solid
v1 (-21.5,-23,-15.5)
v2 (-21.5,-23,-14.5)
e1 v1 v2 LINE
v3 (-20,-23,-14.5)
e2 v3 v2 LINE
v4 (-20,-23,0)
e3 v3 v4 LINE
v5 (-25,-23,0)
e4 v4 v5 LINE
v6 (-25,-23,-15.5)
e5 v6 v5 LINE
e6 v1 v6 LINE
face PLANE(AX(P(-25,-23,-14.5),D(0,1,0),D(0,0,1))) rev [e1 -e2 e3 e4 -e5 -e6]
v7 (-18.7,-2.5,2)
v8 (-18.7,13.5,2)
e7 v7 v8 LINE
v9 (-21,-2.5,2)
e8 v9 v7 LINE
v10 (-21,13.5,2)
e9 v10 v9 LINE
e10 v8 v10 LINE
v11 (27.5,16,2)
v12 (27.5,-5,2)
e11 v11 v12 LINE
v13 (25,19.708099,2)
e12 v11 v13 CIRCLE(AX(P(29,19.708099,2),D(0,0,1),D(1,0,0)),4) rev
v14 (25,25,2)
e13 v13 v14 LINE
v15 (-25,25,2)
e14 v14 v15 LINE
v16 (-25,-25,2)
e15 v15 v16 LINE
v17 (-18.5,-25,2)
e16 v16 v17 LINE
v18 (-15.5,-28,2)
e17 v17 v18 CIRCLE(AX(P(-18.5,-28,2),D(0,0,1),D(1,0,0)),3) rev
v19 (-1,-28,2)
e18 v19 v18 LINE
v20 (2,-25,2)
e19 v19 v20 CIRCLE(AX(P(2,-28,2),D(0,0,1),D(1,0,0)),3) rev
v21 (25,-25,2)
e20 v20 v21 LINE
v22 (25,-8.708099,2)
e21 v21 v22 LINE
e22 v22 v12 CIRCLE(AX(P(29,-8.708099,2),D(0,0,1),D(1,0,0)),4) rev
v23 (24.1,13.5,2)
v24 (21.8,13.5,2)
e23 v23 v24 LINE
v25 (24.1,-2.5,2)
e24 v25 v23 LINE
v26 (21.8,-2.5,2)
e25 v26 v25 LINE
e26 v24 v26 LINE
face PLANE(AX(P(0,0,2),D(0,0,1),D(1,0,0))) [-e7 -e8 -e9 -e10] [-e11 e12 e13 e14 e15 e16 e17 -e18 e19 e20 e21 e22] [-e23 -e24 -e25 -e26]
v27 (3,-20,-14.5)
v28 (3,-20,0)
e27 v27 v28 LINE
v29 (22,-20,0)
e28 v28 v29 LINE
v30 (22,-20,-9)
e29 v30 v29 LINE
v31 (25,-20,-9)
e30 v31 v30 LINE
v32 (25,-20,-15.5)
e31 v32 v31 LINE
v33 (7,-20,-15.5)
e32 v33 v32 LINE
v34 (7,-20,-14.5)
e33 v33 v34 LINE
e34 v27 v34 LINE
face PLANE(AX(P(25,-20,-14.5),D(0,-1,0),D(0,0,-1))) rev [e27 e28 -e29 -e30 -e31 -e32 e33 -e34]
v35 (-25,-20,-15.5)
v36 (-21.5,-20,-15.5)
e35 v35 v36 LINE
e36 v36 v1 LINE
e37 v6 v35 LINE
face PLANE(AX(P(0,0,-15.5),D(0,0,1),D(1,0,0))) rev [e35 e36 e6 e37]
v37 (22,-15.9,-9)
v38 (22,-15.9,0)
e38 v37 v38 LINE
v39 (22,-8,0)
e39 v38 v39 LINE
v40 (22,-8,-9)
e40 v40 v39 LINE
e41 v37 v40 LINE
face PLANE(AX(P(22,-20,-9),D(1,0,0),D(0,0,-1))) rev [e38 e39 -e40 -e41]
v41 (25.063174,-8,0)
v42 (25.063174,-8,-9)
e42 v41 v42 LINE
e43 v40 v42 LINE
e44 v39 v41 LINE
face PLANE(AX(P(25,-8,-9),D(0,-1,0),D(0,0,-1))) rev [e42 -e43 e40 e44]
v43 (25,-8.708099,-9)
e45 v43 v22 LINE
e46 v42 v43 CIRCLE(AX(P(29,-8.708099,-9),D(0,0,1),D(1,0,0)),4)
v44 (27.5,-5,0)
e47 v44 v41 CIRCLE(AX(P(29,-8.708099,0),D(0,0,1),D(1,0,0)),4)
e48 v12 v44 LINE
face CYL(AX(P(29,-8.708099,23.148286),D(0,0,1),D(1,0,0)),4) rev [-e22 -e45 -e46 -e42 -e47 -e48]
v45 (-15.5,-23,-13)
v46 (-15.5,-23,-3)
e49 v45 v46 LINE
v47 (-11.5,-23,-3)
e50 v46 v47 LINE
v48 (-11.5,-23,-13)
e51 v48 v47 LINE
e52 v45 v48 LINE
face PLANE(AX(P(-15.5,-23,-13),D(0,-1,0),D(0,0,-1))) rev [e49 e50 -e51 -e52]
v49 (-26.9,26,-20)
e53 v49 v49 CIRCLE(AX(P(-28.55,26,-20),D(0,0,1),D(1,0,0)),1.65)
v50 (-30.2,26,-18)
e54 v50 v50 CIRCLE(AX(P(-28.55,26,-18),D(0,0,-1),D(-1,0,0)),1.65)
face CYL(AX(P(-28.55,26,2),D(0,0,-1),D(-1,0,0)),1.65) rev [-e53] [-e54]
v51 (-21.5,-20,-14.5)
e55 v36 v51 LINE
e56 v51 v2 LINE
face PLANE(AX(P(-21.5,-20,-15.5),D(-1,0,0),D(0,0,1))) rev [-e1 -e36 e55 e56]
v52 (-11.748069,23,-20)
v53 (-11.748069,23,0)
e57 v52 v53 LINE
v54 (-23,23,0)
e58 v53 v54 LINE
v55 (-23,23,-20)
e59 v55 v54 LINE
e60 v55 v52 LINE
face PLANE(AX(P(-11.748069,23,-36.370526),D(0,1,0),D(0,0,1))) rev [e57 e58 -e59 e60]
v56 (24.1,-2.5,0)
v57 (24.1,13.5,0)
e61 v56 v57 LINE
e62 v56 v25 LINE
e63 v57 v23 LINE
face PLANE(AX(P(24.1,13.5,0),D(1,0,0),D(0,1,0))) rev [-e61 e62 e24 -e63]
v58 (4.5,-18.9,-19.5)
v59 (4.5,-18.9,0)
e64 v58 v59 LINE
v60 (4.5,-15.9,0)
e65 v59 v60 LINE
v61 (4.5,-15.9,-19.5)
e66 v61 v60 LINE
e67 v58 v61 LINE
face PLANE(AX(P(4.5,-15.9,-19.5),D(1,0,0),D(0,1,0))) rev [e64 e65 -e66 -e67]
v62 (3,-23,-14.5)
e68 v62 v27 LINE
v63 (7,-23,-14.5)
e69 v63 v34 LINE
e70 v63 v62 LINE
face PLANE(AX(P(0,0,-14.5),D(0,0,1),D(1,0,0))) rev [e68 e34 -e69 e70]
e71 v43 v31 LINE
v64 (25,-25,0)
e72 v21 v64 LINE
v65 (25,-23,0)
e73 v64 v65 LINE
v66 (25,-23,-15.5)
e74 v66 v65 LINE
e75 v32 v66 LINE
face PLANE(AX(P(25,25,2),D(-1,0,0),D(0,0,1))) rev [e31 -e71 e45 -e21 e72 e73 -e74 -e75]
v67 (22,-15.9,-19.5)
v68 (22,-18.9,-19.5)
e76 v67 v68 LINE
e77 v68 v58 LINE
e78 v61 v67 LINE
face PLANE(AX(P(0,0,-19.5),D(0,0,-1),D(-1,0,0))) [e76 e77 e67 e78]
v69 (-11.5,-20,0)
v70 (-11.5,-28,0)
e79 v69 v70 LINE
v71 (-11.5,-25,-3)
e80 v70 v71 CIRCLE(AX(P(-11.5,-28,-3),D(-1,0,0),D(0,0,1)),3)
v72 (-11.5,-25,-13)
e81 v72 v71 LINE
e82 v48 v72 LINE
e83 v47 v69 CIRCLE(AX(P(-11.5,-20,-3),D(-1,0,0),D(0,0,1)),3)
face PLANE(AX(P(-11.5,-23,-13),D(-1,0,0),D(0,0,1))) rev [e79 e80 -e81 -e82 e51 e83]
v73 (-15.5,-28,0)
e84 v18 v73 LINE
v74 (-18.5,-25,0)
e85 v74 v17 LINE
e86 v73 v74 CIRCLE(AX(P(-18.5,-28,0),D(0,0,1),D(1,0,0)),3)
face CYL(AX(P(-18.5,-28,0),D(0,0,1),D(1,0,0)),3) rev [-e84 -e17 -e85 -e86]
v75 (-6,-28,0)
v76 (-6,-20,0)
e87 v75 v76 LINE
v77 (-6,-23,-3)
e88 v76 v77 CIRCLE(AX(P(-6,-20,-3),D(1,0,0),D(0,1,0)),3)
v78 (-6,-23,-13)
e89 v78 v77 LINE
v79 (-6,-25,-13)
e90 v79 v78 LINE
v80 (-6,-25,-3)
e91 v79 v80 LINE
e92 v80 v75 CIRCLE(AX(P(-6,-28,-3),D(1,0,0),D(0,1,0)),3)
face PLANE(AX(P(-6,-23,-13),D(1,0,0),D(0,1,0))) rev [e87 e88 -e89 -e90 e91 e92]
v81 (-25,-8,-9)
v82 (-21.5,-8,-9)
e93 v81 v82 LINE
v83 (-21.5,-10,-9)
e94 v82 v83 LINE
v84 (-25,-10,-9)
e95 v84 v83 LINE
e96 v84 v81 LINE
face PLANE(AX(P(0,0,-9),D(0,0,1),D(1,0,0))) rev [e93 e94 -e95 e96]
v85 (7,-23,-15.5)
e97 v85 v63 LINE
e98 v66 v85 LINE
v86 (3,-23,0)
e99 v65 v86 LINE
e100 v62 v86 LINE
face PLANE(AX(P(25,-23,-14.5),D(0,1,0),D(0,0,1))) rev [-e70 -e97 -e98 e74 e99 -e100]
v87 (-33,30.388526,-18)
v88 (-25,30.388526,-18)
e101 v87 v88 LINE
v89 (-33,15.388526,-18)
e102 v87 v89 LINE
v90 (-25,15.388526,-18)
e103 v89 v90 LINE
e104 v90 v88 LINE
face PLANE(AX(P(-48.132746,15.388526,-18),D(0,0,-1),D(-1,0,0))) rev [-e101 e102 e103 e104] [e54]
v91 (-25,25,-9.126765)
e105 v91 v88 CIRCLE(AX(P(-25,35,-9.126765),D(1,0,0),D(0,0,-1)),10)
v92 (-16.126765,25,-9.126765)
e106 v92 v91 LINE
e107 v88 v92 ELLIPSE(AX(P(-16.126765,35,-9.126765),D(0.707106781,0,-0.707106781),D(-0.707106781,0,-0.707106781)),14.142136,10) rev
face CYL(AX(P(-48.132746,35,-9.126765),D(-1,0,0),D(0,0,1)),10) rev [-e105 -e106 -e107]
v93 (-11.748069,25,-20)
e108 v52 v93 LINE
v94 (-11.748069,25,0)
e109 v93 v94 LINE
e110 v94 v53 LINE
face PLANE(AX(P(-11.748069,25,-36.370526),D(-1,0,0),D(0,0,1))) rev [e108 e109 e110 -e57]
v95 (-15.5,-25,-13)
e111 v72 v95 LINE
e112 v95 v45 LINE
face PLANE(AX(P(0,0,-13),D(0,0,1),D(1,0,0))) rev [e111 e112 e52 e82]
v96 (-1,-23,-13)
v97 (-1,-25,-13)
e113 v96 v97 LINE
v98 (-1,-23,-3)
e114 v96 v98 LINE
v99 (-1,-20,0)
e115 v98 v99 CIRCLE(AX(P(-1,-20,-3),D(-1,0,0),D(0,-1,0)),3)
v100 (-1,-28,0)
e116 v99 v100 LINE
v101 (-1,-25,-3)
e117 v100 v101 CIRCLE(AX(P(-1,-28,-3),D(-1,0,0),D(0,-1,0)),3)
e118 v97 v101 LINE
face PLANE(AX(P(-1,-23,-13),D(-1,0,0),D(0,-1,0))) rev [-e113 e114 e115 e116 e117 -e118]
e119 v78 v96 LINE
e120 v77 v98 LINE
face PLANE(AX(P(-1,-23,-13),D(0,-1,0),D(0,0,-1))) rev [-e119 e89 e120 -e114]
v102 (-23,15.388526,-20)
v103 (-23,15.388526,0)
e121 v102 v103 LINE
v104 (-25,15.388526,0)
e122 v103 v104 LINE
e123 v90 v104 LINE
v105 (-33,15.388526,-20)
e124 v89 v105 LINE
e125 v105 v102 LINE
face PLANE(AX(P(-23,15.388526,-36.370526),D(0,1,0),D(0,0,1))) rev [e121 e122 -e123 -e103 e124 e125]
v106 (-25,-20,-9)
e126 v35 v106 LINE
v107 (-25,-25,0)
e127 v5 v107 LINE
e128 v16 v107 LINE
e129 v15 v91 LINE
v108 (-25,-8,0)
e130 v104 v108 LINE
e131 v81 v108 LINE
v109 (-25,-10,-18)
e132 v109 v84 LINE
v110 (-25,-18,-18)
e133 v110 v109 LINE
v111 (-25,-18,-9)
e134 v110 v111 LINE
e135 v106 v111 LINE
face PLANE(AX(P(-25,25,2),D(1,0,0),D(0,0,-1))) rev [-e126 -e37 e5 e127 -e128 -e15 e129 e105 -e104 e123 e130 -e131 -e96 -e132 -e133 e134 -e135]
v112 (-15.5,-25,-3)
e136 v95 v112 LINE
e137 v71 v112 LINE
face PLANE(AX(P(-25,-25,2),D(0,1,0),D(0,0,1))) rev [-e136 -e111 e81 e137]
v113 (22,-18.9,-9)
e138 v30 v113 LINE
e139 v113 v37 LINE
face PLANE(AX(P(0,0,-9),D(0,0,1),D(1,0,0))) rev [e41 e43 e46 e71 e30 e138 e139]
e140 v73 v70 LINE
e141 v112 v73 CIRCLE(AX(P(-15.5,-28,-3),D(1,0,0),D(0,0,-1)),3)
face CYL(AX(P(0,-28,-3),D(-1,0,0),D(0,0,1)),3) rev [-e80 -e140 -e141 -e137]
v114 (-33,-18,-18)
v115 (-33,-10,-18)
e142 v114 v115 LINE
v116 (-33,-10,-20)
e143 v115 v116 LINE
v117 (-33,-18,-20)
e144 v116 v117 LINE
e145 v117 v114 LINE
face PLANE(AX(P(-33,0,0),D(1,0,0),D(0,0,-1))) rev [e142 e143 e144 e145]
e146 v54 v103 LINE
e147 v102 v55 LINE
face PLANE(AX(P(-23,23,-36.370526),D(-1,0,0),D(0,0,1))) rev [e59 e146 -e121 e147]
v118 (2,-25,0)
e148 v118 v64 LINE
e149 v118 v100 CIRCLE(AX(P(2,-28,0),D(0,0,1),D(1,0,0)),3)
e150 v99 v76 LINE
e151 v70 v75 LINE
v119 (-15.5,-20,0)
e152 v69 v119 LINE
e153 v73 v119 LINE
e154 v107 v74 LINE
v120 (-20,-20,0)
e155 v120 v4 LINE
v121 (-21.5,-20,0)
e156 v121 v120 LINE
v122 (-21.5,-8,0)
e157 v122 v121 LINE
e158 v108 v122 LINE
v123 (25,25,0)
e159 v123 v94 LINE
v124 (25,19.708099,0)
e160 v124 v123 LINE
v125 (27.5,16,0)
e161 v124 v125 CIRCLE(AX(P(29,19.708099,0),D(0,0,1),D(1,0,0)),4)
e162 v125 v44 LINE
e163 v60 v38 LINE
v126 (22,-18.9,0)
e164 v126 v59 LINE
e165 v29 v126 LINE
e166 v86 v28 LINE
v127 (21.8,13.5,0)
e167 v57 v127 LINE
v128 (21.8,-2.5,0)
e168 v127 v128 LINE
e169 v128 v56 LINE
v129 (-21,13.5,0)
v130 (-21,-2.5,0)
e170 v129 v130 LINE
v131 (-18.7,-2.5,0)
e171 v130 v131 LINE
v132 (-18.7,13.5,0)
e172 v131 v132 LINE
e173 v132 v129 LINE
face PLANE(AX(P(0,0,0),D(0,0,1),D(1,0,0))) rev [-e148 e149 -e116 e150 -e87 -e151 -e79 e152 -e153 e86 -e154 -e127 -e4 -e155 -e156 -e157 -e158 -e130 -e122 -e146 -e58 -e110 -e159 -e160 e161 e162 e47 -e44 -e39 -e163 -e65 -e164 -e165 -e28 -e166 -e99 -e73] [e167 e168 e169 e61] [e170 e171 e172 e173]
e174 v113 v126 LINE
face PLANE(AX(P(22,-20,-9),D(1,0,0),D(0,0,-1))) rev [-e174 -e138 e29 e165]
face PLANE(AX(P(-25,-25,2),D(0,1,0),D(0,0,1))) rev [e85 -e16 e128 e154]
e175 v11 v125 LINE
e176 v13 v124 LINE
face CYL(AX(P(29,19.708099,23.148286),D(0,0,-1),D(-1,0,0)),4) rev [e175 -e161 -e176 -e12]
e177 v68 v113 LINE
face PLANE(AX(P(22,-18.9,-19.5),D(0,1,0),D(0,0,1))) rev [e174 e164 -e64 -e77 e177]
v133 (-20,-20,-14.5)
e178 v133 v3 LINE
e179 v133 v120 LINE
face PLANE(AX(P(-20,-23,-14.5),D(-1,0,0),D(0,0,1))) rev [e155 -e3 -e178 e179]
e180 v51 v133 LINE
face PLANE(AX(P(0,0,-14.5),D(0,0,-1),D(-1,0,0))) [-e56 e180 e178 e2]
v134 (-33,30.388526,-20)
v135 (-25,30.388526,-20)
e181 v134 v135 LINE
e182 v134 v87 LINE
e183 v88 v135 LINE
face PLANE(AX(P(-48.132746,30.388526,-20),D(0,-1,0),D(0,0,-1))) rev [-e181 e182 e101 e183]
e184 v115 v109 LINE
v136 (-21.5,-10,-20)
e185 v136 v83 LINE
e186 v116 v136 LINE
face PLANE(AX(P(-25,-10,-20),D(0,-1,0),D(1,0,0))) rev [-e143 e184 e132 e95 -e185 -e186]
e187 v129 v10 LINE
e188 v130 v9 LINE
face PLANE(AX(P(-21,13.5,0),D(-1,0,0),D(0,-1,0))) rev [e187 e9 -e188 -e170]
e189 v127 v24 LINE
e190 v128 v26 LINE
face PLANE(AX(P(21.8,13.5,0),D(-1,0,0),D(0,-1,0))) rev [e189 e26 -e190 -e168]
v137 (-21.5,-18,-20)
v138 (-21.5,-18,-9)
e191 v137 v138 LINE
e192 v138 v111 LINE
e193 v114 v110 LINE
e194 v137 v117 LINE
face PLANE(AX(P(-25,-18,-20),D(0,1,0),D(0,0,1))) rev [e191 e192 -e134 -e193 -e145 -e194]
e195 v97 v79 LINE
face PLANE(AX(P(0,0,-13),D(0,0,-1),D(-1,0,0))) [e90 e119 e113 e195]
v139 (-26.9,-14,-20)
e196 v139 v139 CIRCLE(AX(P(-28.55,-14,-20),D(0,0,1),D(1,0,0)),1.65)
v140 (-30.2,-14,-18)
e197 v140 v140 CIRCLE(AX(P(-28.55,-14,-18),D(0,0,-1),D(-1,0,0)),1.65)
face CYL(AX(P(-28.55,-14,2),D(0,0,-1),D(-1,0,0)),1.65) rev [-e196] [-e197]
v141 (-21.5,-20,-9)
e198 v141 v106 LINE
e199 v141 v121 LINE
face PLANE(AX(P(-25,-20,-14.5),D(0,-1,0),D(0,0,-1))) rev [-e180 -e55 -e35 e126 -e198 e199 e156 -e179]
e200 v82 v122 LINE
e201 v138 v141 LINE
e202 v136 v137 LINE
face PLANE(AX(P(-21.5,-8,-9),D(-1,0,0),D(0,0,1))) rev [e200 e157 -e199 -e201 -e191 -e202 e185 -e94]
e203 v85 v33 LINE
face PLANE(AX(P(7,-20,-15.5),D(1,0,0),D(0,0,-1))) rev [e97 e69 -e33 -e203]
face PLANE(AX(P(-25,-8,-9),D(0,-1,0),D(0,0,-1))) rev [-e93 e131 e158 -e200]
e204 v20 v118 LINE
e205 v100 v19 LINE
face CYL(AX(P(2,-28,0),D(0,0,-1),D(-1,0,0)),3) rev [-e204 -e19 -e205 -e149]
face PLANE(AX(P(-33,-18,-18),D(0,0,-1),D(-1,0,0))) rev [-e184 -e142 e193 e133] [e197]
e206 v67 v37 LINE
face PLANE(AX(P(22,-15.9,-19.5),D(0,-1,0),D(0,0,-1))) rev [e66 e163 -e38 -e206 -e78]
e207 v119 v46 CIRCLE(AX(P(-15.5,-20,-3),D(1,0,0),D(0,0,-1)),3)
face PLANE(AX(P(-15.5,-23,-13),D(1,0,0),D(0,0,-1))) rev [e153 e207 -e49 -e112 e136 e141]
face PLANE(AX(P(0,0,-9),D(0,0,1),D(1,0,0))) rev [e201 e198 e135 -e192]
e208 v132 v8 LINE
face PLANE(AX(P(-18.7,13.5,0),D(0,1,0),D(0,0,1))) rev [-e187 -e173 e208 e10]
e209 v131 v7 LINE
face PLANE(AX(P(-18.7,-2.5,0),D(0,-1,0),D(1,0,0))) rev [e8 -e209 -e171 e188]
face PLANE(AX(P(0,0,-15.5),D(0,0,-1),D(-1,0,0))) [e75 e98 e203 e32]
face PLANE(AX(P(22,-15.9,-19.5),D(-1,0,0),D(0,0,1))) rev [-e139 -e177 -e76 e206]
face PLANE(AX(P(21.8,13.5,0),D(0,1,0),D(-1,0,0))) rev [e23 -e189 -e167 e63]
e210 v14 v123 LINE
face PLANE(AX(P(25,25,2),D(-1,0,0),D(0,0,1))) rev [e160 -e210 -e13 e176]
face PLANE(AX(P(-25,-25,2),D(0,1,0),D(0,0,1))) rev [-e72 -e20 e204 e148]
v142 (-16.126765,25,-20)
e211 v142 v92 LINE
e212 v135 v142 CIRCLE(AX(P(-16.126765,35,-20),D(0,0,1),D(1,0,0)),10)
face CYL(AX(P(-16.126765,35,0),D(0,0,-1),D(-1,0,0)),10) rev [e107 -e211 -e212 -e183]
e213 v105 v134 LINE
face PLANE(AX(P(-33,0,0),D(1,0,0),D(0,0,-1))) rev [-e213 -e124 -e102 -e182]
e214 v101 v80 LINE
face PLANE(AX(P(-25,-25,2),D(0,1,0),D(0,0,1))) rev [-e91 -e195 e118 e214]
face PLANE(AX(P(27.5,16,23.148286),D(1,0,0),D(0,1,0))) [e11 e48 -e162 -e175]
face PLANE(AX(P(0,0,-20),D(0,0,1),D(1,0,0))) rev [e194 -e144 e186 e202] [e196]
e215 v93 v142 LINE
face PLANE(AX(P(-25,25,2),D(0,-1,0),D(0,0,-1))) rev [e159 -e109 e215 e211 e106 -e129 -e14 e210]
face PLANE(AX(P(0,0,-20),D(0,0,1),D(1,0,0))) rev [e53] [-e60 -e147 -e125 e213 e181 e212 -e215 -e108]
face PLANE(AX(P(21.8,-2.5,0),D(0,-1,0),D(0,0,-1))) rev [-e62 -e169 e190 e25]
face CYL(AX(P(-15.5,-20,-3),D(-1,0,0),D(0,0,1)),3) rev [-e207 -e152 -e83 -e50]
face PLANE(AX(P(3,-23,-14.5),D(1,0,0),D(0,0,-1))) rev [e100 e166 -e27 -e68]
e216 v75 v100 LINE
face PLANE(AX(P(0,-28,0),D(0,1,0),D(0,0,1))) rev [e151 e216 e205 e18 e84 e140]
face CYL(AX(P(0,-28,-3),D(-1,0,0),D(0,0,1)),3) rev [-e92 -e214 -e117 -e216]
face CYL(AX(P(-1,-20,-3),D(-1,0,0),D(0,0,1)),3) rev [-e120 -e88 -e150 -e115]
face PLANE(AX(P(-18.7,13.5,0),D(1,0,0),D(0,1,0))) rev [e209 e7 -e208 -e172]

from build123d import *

# Parameters (mm, degrees)
SKETCH1_W               = 50
SKETCH1_H               = 50
BOSS_EXTRUDE1_DEPTH     = 2
CUT_EXTRUDE1_DEPTH      = 36.411862419
CUT_EXTRUDE1_DEPTH_BACK = 36.411862419
SKETCH2_W               = 2.3
SKETCH2_H               = 16
SKETCH3_W               = 22
SKETCH3_H               = 3
SKETCH3_W_2             = 5
BOSS_EXTRUDE2_DEPTH     = 14.5
SKETCH4_W               = 5
SKETCH4_H               = 2
SKETCH4_W_2             = 4
BOSS_EXTRUDE11_DEPTH    = 13
SKETCH5_W               = 3.5
SKETCH5_H               = 3
SKETCH5_W_2             = 18
BOSS_EXTRUDE12_DEPTH    = 1
SKETCH6_W               = 3.5
SKETCH6_H               = 12
SKETCH6_W_2             = 3
BOSS_EXTRUDE13_DEPTH    = 9
SKETCH7_W               = 3.5
SKETCH7_H               = 8
BOSS_EXTRUDE14_DEPTH    = 11
SKETCH8_W               = 2
SKETCH8_H               = 8
BOSS_EXTRUDE15_DEPTH    = 8
BOSS_EXTRUDE16_DEPTH    = 20
SKETCH10_W              = 2
SKETCH10_H              = 15
BOSS_EXTRUDE17_DEPTH    = 8
FILLET1_R               = 10
FILLET2_START           = -18
FILLET2_DEPTH           = 0.13972
FILLET2_START_2         = -17.86028
FILLET2_2_DEPTH         = 8.733515347
FILLET2_START_3         = -25
FILLET2_3_DEPTH         = 8.873235347
CUT_EXTRUDE2_DEPTH      = 50.964612469
CUT_EXTRUDE2_DEPTH_BACK = 50.964612469
SKETCH11_R              = 1.65
SKETCH13_W              = 2.5
SKETCH13_H              = 21
BOSS_EXTRUDE18_DEPTH    = 2
FILLET3_R               = 4
SKETCH14_W              = 17.5
SKETCH14_H              = 3
BOSS_EXTRUDE19_DEPTH    = 19.5
FILLET4_R               = 3
SKETCH15_W              = 14.5
SKETCH15_H              = 2
BOSS_EXTRUDE20_DEPTH    = 3
FILLET5_R               = 3
FILLET6_R               = 3


with BuildPart() as part:
    # Sketch1 → Boss-Extrude1 (new body)
    with BuildSketch(Plane.XY):
        Rectangle(SKETCH1_W, SKETCH1_H)
    extrude(amount=BOSS_EXTRUDE1_DEPTH)

    # Sketch2 → Cut-Extrude1 (cut, two sides: drawn at the far end of the back side and taken through both)
    with BuildSketch(Plane.XY.offset(2).offset(-CUT_EXTRUDE1_DEPTH_BACK)):
        with Locations((-19.85, 5.5)):
            Rectangle(SKETCH2_W, SKETCH2_H)
        with Locations((22.95, 5.5)):
            Rectangle(SKETCH2_W, SKETCH2_H)
    extrude(amount=CUT_EXTRUDE1_DEPTH + CUT_EXTRUDE1_DEPTH_BACK, mode=Mode.SUBTRACT)

    # Sketch3 → Boss-Extrude2 (add)
    with BuildSketch(Plane(origin=(0, 0, 0), x_dir=(-1, 0, 0), z_dir=(0, 0, -1))):
        with Locations((-14, -21.5)):
            Rectangle(SKETCH3_W, SKETCH3_H)
        with Locations((22.5, -21.5)):
            Rectangle(SKETCH3_W_2, SKETCH3_H)
    extrude(amount=BOSS_EXTRUDE2_DEPTH)

    # Sketch4 → Boss-Extrude11 (add)
    with BuildSketch(Plane(origin=(0, 0, 0), x_dir=(-1, 0, 0), z_dir=(0, 0, -1))):
        with Locations((3.5, -24)):
            Rectangle(SKETCH4_W, SKETCH4_H)
        with Locations((13.5, -24)):
            Rectangle(SKETCH4_W_2, SKETCH4_H)
    extrude(amount=BOSS_EXTRUDE11_DEPTH)

    # Sketch5 → Boss-Extrude12 (add)
    with BuildSketch(Plane(origin=(0, 0, -14.5), x_dir=(-1, 0, 0), z_dir=(0, 0, -1))):
        with Locations((23.25, -21.5)):
            Rectangle(SKETCH5_W, SKETCH5_H)
        with Locations((-16, -21.5)):
            Rectangle(SKETCH5_W_2, SKETCH5_H)
    extrude(amount=BOSS_EXTRUDE12_DEPTH)

    # Sketch6 → Boss-Extrude13 (add)
    with BuildSketch(Plane(origin=(0, 0, 0), x_dir=(-1, 0, 0), z_dir=(0, 0, -1))):
        with Locations((23.25, -14)):
            Rectangle(SKETCH6_W, SKETCH6_H)
        with Locations((-23.5, -14)):
            Rectangle(SKETCH6_W_2, SKETCH6_H)
    extrude(amount=BOSS_EXTRUDE13_DEPTH)

    # Sketch7 → Boss-Extrude14 (add)
    with BuildSketch(Plane(origin=(0, 0, -9), x_dir=(-1, 0, 0), z_dir=(0, 0, -1))):
        with Locations((23.25, -14)):
            Rectangle(SKETCH7_W, SKETCH7_H)
    extrude(amount=BOSS_EXTRUDE14_DEPTH)

    # Sketch8 → Boss-Extrude15 (add)
    with BuildSketch(Plane.ZY.offset(25)):
        with Locations((-19, -14)):
            Rectangle(SKETCH8_W, SKETCH8_H)
    extrude(amount=BOSS_EXTRUDE15_DEPTH)

    # Sketch9 → Boss-Extrude16 (add)
    with BuildSketch(Plane(origin=(0, 0, 0), x_dir=(-1, 0, 0), z_dir=(0, 0, -1))):
        Polygon((11.748068925, 25), (11.748068925, 23), (23, 23), (23, 15.388525781), (25, 15.388525781), (25, 25), align=None)
    extrude(amount=BOSS_EXTRUDE16_DEPTH)

    # Sketch10 → Boss-Extrude17 (add)
    with BuildSketch(Plane.ZY.offset(25)):
        with Locations((-19, 22.888525781)):
            Rectangle(SKETCH10_W, SKETCH10_H)
    extrude(amount=BOSS_EXTRUDE17_DEPTH)

    # Fillet1
    # the kernel refuses this fillet: 10 mm, written as the material it adds along each edge
    with BuildSketch(Plane(origin=(-25, 25, -20), x_dir=(1, 0, 0), z_dir=(0, 0, 1))) as fillet1_piece_1:
        with BuildLine():
            CenterArc((8.873235347, 10), FILLET1_R, 207.461173358, 62.538826642)
            Line((0, 5.388525781), (0, 0))
            Line((0, 0), (8.873235347, 0))
        make_face()
    extrude(amount=2)

    # Fillet2: read off the stored shape, not the designer's step
    # Fillet2 outline → Fillet2 (add)
    with BuildSketch(Plane.XY.offset(FILLET2_START)):
        with BuildLine():
            Line((-25, 30.388525781), (-25, 25))
            Line((-25, 25), (-16.126764653, 25))
            ThreePointArc((-16.126764653, 25), (-21.317393604, 26.452639525), (-25, 30.388525781))
        make_face()
    extrude(amount=FILLET2_DEPTH)

    # Fillet2 2 outline → Fillet2 2 (add)
    with BuildSketch(Plane.XY.offset(FILLET2_START_2)):
        with BuildLine():
            Line((-25, 30.388525781), (-25, 25))
            Line((-25, 25), (-16.126764653, 25))
            ThreePointArc((-16.126764653, 25), (-21.317393604, 26.452639525), (-25, 30.388525781))
        make_face()
    extrude(amount=FILLET2_2_DEPTH)

    # Fillet2 3 outline → Fillet2 3 (cut)
    with BuildSketch(Plane.YZ.offset(FILLET2_START_3)):
        with BuildLine():
            ThreePointArc((25, -9.126764653), (26.452639525, -14.317393604), (30.388525781, -18))
            Line((30.388525781, -18), (32, -18.837492924))
            Line((32, -18.837492924), (32, -9.126764653))
            Line((32, -9.126764653), (25, -9.126764653))
        make_face()
    extrude(amount=FILLET2_3_DEPTH, mode=Mode.SUBTRACT)

    # Sketch11 → Cut-Extrude2 (cut, two sides: drawn at the far end of the back side and taken through both)
    with BuildSketch(Plane(origin=(0, 0, -20), x_dir=(-1, 0, 0), z_dir=(0, 0, -1)).offset(-CUT_EXTRUDE2_DEPTH_BACK)):
        with Locations((28.55, 26)):
            Circle(SKETCH11_R)
        with Locations((28.55, -14)):
            Circle(SKETCH11_R)
    extrude(amount=CUT_EXTRUDE2_DEPTH + CUT_EXTRUDE2_DEPTH_BACK, mode=Mode.SUBTRACT)

    # Sketch13 → Boss-Extrude18 (add)
    with BuildSketch(Plane(origin=(0, 0, 0), x_dir=(-1, 0, 0), z_dir=(0, 0, -1))):
        with Locations((-26.25, 5.5)):
            Rectangle(SKETCH13_W, SKETCH13_H)
    extrude(amount=-BOSS_EXTRUDE18_DEPTH)

    # Fillet3
    # the kernel refuses this fillet: 4 mm, written as the material it adds along each edge
    with BuildSketch(Plane(origin=(25, -5, -9.270248109), x_dir=(0, -1, 0), z_dir=(0, 0, 1))) as fillet3_piece_1_section:
        with BuildLine():
            CenterArc((3.708099244, 4), FILLET3_R, 202.024312837, 67.975687163)
            Line((0, 2.5), (-0.074161985, 2.47))
            ThreePointArc((-0.074161985, 2.47), (-0.08, 1.25), (-0.08, 0))
            Line((-0.08, 0), (0, -0.08))
            Line((0, -0.08), (3.708099244, -0.08))
            Line((3.708099244, -0.08), (3.708099244, 0))
        make_face()
    fillet3_piece_1 = extrude(amount=11.270248109, mode=Mode.PRIVATE)
    fillet3_piece_1 = split(fillet3_piece_1, bisect_by=Plane(origin=(25, -5, 0), z_dir=(0, 0, -1)), keep=Keep.TOP, mode=Mode.PRIVATE)
    fillet3_piece_1 = split(fillet3_piece_1, bisect_by=Plane(origin=(25, -8, -9.270248109), z_dir=(0, -1, 0)), keep=Keep.TOP, mode=Mode.PRIVATE)
    fillet3_piece_1 = split(fillet3_piece_1, bisect_by=Plane(origin=(25, -5, -9), z_dir=(0, 0, 1)), keep=Keep.TOP, mode=Mode.PRIVATE)
    add(fillet3_piece_1)
    with BuildSketch(Plane(origin=(25, -5, 0), x_dir=(0, -1, 0), z_dir=(0, 0, 1))) as fillet3_piece_2_section:
        with BuildLine():
            CenterArc((3.708099244, 4), FILLET3_R, 202.024312837, 67.975687163)
            Line((0, 2.5), (-0.074161985, 2.47))
            ThreePointArc((-0.074161985, 2.47), (-0.08, 1.25), (-0.08, 0))
            Line((-0.08, 0), (0, -0.08))
            Line((0, -0.08), (3.708099244, -0.08))
            Line((3.708099244, -0.08), (3.708099244, 0))
        make_face()
    fillet3_piece_2 = extrude(amount=2, mode=Mode.PRIVATE)
    fillet3_piece_2 = split(fillet3_piece_2, bisect_by=Plane(origin=(25, -8, 0), z_dir=(0, -1, 0)), keep=Keep.TOP, mode=Mode.PRIVATE)
    add(fillet3_piece_2)
    with BuildSketch(Plane(origin=(25, -5, 0), x_dir=(0, -1, 0), z_dir=(0, 0, 1))) as fillet3_piece_3_section:
        with BuildLine():
            CenterArc((3.708099244, 4), FILLET3_R, 202.024312837, 67.975687163)
            Line((0, 2.5), (-0.074161985, 2.47))
            ThreePointArc((-0.074161985, 2.47), (-0.08, 1.25), (-0.08, 0))
            Line((-0.08, 0), (0, -0.08))
            Line((0, -0.08), (3.708099244, -0.08))
            Line((3.708099244, -0.08), (3.708099244, 0))
        make_face()
    fillet3_piece_3 = extrude(amount=2, mode=Mode.PRIVATE)
    fillet3_piece_3 = split(fillet3_piece_3, bisect_by=Plane(origin=(25, -8, 0), z_dir=(0, 1, 0)), keep=Keep.TOP, mode=Mode.PRIVATE)
    add(fillet3_piece_3)
    with BuildSketch(Plane(origin=(25, 16, 0), x_dir=(0, 1, 0), z_dir=(0, 0, 1))) as fillet3_piece_4:
        with BuildLine():
            CenterArc((3.708099244, -4), FILLET3_R, 90, 67.975687163)
            Line((0, -2.5), (-0.074161985, -2.47))
            ThreePointArc((-0.074161985, -2.47), (-0.08, -1.25), (-0.08, 0))
            Line((-0.08, 0), (0, 0.08))
            Line((0, 0.08), (3.708099244, 0.08))
            Line((3.708099244, 0.08), (3.708099244, 0))
        make_face()
    extrude(amount=2)

    # Sketch14 → Boss-Extrude19 (add)
    with BuildSketch(Plane(origin=(0, 0, 0), x_dir=(-1, 0, 0), z_dir=(0, 0, -1))):
        with Locations((-13.25, -17.4)):
            Rectangle(SKETCH14_W, SKETCH14_H)
    extrude(amount=BOSS_EXTRUDE19_DEPTH)

    # Fillet4
    fillet4_edges = [part.edges().sort_by_distance(p)[0] for p in [
        (-3.5, -23, 0),
        (-13.5, -23, 0),
    ]]
    fillet(fillet4_edges, radius=FILLET4_R)

    # Sketch15 → Boss-Extrude20 (add)
    with BuildSketch(Plane.XZ.offset(25)):
        with Locations((-8.25, 1)):
            Rectangle(SKETCH15_W, SKETCH15_H)
    extrude(amount=BOSS_EXTRUDE20_DEPTH)

    # Fillet5
    # the kernel refuses this fillet: 3 mm, written as the material it adds along each edge
    with BuildSketch(Plane(origin=(-15.5, -25, 2), x_dir=(-1, 0, 0), z_dir=(0, 0, -1)), Plane(origin=(-1, -25, 0), x_dir=(1, 0, 0), z_dir=(0, 0, 1))) as fillet5_piece_1:
        with BuildLine():
            CenterArc((FILLET5_R, -FILLET5_R), FILLET5_R, 90, 90)
            Line((0, -FILLET5_R), (0, 0))
            Line((0, 0), (FILLET5_R, 0))
        make_face()
    extrude(amount=2)

    # Fillet6
    fillet6_edges = [part.edges().sort_by_distance(p)[0] for p in [
        (-3.5, -25, 0),
        (-13.5, -25, 0),
    ]]
    fillet(fillet6_edges, radius=FILLET6_R - 0.0001)  # a hair under: the kernel refuses the full size


solid = part.part
